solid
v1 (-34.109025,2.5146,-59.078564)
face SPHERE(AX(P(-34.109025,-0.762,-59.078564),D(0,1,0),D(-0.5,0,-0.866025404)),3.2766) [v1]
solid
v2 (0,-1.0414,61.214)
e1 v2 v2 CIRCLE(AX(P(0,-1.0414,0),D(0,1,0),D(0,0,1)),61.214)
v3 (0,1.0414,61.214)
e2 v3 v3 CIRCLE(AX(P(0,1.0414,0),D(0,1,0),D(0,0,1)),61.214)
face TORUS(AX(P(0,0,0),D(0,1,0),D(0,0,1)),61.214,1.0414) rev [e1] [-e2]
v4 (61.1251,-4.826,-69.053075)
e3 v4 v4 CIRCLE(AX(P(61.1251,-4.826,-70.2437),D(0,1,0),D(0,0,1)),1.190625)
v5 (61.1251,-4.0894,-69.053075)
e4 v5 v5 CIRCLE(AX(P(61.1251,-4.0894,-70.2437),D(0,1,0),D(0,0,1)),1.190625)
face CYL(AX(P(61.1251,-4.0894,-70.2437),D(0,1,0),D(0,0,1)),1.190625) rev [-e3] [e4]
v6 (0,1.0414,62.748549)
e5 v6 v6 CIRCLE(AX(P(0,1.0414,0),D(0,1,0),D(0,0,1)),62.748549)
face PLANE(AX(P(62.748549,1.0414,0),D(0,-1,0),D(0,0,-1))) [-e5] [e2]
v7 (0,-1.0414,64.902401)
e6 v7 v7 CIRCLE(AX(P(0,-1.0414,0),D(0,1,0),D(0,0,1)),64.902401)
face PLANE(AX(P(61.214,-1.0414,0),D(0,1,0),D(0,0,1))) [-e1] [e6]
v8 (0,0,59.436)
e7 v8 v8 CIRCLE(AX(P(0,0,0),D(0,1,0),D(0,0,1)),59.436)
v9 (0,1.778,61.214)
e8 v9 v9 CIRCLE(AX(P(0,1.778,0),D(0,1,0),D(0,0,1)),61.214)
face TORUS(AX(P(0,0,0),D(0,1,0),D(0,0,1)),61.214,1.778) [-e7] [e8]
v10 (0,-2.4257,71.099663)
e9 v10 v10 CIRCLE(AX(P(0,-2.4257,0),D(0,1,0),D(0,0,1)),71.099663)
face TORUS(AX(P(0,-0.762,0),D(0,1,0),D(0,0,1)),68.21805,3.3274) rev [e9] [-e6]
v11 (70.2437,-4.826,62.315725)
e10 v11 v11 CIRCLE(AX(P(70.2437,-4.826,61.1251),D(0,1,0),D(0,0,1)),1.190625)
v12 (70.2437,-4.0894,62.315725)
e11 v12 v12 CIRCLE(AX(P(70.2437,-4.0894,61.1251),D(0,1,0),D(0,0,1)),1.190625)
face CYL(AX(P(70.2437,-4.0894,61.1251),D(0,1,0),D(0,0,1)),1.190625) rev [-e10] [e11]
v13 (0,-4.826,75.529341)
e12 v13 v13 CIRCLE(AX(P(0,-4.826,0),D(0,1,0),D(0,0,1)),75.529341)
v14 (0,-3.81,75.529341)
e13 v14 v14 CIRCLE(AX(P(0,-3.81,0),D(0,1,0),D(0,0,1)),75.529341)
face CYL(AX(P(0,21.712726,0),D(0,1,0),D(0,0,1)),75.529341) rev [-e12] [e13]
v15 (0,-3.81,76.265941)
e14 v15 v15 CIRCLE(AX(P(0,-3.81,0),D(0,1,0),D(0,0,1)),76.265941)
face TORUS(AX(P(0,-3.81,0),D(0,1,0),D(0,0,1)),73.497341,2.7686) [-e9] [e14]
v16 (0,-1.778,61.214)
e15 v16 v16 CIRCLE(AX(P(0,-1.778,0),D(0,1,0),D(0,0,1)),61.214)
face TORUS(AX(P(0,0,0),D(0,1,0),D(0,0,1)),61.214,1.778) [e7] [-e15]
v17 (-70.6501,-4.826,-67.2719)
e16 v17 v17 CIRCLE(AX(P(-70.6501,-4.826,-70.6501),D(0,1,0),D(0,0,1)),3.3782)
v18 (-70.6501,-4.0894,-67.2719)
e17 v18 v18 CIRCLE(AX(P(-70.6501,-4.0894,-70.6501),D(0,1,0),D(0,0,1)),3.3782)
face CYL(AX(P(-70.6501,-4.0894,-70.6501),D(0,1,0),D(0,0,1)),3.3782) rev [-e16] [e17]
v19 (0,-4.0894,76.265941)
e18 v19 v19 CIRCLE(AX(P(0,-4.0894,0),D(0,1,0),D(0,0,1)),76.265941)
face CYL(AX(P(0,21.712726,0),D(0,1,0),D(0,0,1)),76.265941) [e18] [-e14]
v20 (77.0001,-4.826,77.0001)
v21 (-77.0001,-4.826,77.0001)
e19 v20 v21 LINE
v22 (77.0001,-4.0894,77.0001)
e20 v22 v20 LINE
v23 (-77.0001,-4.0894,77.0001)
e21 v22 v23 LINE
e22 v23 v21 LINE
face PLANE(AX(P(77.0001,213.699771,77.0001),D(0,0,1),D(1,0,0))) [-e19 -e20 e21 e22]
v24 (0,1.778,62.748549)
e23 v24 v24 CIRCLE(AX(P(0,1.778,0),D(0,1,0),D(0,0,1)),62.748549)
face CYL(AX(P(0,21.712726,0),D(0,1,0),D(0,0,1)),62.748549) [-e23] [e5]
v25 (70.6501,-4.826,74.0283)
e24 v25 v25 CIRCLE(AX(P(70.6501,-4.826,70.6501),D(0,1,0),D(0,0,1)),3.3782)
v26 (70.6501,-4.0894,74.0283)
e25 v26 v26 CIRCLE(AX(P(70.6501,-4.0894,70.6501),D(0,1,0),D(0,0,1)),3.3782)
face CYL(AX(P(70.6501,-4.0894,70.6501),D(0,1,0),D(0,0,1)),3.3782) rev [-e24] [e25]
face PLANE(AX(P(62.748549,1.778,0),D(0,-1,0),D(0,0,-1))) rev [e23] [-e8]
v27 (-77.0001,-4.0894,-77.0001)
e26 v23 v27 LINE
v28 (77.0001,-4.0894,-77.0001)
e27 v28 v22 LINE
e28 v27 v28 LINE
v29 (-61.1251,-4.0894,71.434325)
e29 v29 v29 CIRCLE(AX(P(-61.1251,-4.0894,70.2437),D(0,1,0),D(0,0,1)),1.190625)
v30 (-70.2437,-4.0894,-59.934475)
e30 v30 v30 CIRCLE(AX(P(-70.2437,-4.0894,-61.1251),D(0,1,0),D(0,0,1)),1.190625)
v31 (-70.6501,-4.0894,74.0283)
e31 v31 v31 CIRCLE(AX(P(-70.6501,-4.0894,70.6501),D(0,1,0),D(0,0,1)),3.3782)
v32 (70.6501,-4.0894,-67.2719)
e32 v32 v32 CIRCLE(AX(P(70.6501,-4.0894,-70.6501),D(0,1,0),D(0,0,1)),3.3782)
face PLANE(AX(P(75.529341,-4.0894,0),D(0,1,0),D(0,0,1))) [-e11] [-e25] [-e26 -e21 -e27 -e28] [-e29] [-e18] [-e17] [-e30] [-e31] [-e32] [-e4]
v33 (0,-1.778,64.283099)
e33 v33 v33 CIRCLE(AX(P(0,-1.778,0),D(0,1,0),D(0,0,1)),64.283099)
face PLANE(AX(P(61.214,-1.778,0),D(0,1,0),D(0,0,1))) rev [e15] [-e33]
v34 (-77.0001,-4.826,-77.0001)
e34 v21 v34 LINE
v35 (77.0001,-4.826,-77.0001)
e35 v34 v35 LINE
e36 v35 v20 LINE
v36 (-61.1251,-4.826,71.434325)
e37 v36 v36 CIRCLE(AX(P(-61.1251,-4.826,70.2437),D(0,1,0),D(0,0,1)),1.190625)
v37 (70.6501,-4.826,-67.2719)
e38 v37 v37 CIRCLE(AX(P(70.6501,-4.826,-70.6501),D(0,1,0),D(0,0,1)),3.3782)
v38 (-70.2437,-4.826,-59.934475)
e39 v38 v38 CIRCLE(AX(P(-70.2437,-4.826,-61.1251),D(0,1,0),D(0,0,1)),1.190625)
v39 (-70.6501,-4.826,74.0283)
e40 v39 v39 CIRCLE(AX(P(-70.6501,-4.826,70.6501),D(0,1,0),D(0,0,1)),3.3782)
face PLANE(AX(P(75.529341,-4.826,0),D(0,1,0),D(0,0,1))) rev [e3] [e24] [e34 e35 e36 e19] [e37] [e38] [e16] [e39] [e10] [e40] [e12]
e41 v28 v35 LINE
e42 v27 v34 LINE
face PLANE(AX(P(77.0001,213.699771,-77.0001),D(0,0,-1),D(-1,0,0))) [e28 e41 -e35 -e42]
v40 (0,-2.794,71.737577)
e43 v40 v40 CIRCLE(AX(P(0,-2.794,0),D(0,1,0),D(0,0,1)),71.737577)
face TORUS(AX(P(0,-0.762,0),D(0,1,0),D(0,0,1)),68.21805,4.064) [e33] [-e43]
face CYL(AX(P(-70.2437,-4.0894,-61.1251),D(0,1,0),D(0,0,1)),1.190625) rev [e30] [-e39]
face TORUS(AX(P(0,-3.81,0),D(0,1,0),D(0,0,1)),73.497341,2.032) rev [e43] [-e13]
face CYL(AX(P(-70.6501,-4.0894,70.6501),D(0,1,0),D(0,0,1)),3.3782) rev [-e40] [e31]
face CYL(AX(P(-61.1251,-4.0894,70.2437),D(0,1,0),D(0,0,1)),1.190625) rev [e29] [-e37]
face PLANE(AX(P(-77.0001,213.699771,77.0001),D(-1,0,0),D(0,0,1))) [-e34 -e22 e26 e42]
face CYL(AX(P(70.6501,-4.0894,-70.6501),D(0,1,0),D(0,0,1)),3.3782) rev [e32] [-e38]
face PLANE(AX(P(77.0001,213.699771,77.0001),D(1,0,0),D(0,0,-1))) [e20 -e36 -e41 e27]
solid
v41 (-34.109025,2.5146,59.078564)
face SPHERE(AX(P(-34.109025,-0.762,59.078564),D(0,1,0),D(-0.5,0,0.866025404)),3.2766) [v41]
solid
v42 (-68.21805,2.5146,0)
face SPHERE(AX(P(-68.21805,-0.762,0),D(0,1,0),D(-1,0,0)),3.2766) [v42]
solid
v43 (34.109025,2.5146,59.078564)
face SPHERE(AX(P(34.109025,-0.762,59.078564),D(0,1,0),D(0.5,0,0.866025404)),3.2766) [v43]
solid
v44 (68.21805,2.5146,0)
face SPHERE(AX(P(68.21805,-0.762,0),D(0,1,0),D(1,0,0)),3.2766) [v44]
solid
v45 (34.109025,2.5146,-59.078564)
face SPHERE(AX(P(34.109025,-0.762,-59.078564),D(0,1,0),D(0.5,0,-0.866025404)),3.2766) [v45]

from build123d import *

# Parameters (mm, degrees)
SKETCH2_W                                 = 154.0002
SKETCH2_H                                 = 154.0002
SKETCH2_R                                 = 75.529340861
EXTRUDE1_DEPTH                            = 0.7366
EXTRUDE2_START                            = -0.7366
SKETCH3_R                                 = 75.529340861
EXTRUDE2_DEPTH                            = 0.7366
CIRPATTERN1_COUNT                         = 6
SKETCH5_W                                 = 3.3782
SKETCH5_H                                 = 0.7366
F_5_32_0_156250_DIAMETER_HOLE1_AT_2_COUNT = 2
F_5_32_0_156250_DIAMETER_HOLE1_AT_2_PITCH = 141.3002
F_5_32_0_156250_DIAMETER_HOLE1_AT_3_COUNT = 2
F_5_32_0_156250_DIAMETER_HOLE1_AT_3_PITCH = 141.3002
F_5_32_0_156250_DIAMETER_HOLE1_AT_4_COUNT = 2
F_5_32_0_156250_DIAMETER_HOLE1_AT_4_PITCH = 199.828659206
SKETCH7_W                                 = 2.3876
SKETCH7_H                                 = 8.128
F_5_32_0_156250_DIAMETER_HOLE2_AT_2_COUNT = 2
F_5_32_0_156250_DIAMETER_HOLE2_AT_2_PITCH = 121.0564
F_5_32_0_156250_DIAMETER_HOLE2_AT_3_COUNT = 2
F_5_32_0_156250_DIAMETER_HOLE2_AT_3_PITCH = 171.199602692
F_5_32_0_156250_DIAMETER_HOLE2_AT_4_COUNT = 2
F_5_32_0_156250_DIAMETER_HOLE2_AT_4_PITCH = 121.0564
CIRPATTERN2_COUNT                         = 4


# Read off the part's stored shape, not the designer's step: Revolve-Thin5
with BuildPart() as part:
    # Sketch1 → Revolve-Thin4 (revolve)
    with BuildSketch(Plane.XY, mode=Mode.PRIVATE) as revolve_thin4_sk:
        with BuildLine():
            Line((62.74854946, 1.778), (61.214, 1.778))
            ThreePointArc((61.214, 1.778), (59.436, 0), (61.214, -1.778))
            Line((61.214, -1.778), (64.28309892, -1.778))
            ThreePointArc((64.28309892, -1.778), (67.669225582, -4.788771381), (71.737577241, -2.794))
            ThreePointArc((71.737577241, -2.794), (74.023261161, -1.847238721), (75.529340861, -3.81))
            Line((75.529340861, -3.81), (75.529340861, -4.826))
            Line((75.529340861, -4.826), (77.0001, -4.826))
            Line((77.0001, -4.826), (77.0001, -4.0894))
            Line((77.0001, -4.0894), (76.265940861, -4.0894))
            Line((76.265940861, -4.0894), (76.265940861, -3.81))
            ThreePointArc((76.265940861, -3.81), (74.21390727, -1.135737757), (71.099662929, -2.4257))
            ThreePointArc((71.099662929, -2.4257), (67.492675346, -4.00937161), (64.902401285, -1.0414))
            Line((64.902401285, -1.0414), (61.214, -1.0414))
            ThreePointArc((61.214, -1.0414), (60.1726, 0), (61.214, 1.0414))
            Line((61.214, 1.0414), (62.74854946, 1.0414))
            Line((62.74854946, 1.0414), (62.74854946, 1.778))
        make_face()
    revolve(revolve_thin4_sk.sketch.rotate(Axis((0, 21.71272626, 0), (0, -1, 0)), 90), axis=Axis((0, 21.71272626, 0), (0, -1, 0)))

    # Sketch2 → Extrude1 (add)
    with BuildSketch(Plane.XZ.offset(4.826)):
        Rectangle(SKETCH2_W, SKETCH2_H)
        with Locations(Location((0, 0, 0), (0, 0, 90))):
            Circle(SKETCH2_R, mode=Mode.SUBTRACT)
    extrude(amount=-EXTRUDE1_DEPTH)

    # Sketch5 → 5/32 (0.156250) Diameter Hole1 (revolve, cut)
    with BuildSketch(Plane(origin=(70.6501, -4.0894, -70.6501), x_dir=(0, 0, 1), z_dir=(1, 0, 0))):
        with Locations((1.6891, 0.3683)):
            Rectangle(SKETCH5_W, SKETCH5_H)
    f_5_32_0_156250_diameter_hole1 = revolve(axis=Axis((70.6501, 2.2606, -70.6501), (0, -1, 0)), mode=Mode.SUBTRACT)

    # 5/32 (0.156250) Diameter Hole1 at 2: 5/32 (0.156250) Diameter Hole1 ×2
    with Locations(*[(0, 0, i * F_5_32_0_156250_DIAMETER_HOLE1_AT_2_PITCH) for i in range(1, F_5_32_0_156250_DIAMETER_HOLE1_AT_2_COUNT)]):
        add(f_5_32_0_156250_diameter_hole1, mode=Mode.SUBTRACT)

    # 5/32 (0.156250) Diameter Hole1 at 3: 5/32 (0.156250) Diameter Hole1 ×2
    with Locations(*[(-i * F_5_32_0_156250_DIAMETER_HOLE1_AT_3_PITCH, 0, 0) for i in range(1, F_5_32_0_156250_DIAMETER_HOLE1_AT_3_COUNT)]):
        add(f_5_32_0_156250_diameter_hole1, mode=Mode.SUBTRACT)

    # 5/32 (0.156250) Diameter Hole1 at 4: 5/32 (0.156250) Diameter Hole1 ×2
    with Locations(*[Vector(-0.7071067811865476, 0, 0.7071067811865476) * (i * F_5_32_0_156250_DIAMETER_HOLE1_AT_4_PITCH) for i in range(1, F_5_32_0_156250_DIAMETER_HOLE1_AT_4_COUNT)]):
        add(f_5_32_0_156250_diameter_hole1, mode=Mode.SUBTRACT)

    # Sketch11 → 3/32 (0.093750) Diameter Hole2 (revolve, cut)
    with BuildSketch(Plane(origin=(-70.2437, -4.0894, -61.1251), x_dir=(0, 0, 1), z_dir=(1, 0, 0))):
        Polygon((0, 0), (0, 26.115399675), (1.190625, 25.4), (1.190625, 0), align=None)
    f_3_32_0_093750_diameter_hole2 = revolve(axis=Axis((-70.2437, 2.2606, -61.1251), (0, -1, 0)), mode=Mode.SUBTRACT)

    # CirPattern2: 3/32 (0.093750) Diameter Hole2 ×4 about axis
    cirpattern2_axis = Axis((0, 0, 0), (0, 1, 0))
    for i in range(1, CIRPATTERN2_COUNT):
        add(f_3_32_0_093750_diameter_hole2.rotate(cirpattern2_axis, i * 360 / CIRPATTERN2_COUNT), mode=Mode.SUBTRACT)


with BuildPart() as body_2:
    # Revolve-Thin5 outline → Revolve-Thin5 (revolve)
    with BuildSketch(Plane.XY):
        with BuildLine():
            Line((76.265940861, 2.5654), (77.0001, 2.5654))
            Line((77.0001, 2.5654), (77.0001, 3.302))
            Line((77.0001, 3.302), (75.529340861, 3.302))
            Line((75.529340861, 3.302), (75.529340861, 2.286))
            ThreePointArc((75.529340861, 2.286), (74.023261161, 0.323238721), (71.737577241, 1.27))
            ThreePointArc((71.737577241, 1.27), (68.088390068, 3.299931105), (64.576093872, 1.0414))
            Line((64.576093872, 1.0414), (61.214, 1.0414))
            Line((61.214, 1.0414), (61.214, 0.3048))
            Line((61.214, 0.3048), (65.066299927, 0.3048))
            ThreePointArc((65.066299927, 0.3048), (67.890458911, 2.54923464), (71.099662929, 0.9017))
            ThreePointArc((71.099662929, 0.9017), (74.21390727, -0.388262243), (76.265940861, 2.286))
            Line((76.265940861, 2.286), (76.265940861, 2.5654))
        make_face()
    revolve(axis=Axis((0, 0, 0), (0, 1, 0)))

    # Sketch3 → Extrude2 (add)
    with BuildSketch(Plane(origin=(0, 3.302, 0), x_dir=(-1, 0, 0), z_dir=(0, 1, 0)).offset(EXTRUDE2_START)):
        Polygon((0, -108.894585724), (108.894585724, 0), (0, 108.894585724), (-108.894585724, 0), align=None)
        with Locations(Location((0, 0, 0), (0, 0, 90))):
            Circle(SKETCH3_R, mode=Mode.SUBTRACT)
    extrude(amount=EXTRUDE2_DEPTH)

    # Sketch7 → 5/32 (0.156250) Diameter Hole2 (revolve, cut)
    with BuildSketch(Plane(origin=(85.599801346, 3.302, 0), x_dir=(0, 0, 1), z_dir=(1, 0, 0))):
        with Locations((1.1938, 4.064)):
            Rectangle(SKETCH7_W, SKETCH7_H)
    f_5_32_0_156250_diameter_hole2 = revolve(axis=Axis((85.599801346, 9.652, 0), (0, -1, 0)), mode=Mode.SUBTRACT)

    # 5/32 (0.156250) Diameter Hole2 at 2: 5/32 (0.156250) Diameter Hole2 ×2
    with Locations(*[Vector(-0.7071067811865476, 0, -0.7071067811865476) * (i * F_5_32_0_156250_DIAMETER_HOLE2_AT_2_PITCH) for i in range(1, F_5_32_0_156250_DIAMETER_HOLE2_AT_2_COUNT)]):
        add(f_5_32_0_156250_diameter_hole2, mode=Mode.SUBTRACT)

    # 5/32 (0.156250) Diameter Hole2 at 3: 5/32 (0.156250) Diameter Hole2 ×2
    with Locations(*[(-i * F_5_32_0_156250_DIAMETER_HOLE2_AT_3_PITCH, 0, 0) for i in range(1, F_5_32_0_156250_DIAMETER_HOLE2_AT_3_COUNT)]):
        add(f_5_32_0_156250_diameter_hole2, mode=Mode.SUBTRACT)

    # 5/32 (0.156250) Diameter Hole2 at 4: 5/32 (0.156250) Diameter Hole2 ×2
    with Locations(*[Vector(-0.7071067811865476, 0, 0.7071067811865476) * (i * F_5_32_0_156250_DIAMETER_HOLE2_AT_4_PITCH) for i in range(1, F_5_32_0_156250_DIAMETER_HOLE2_AT_4_COUNT)]):
        add(f_5_32_0_156250_diameter_hole2, mode=Mode.SUBTRACT)


with BuildPart() as body_3:
    # Sketch4 → Revolve1 (revolve)
    with BuildSketch(Plane.XY):
        with BuildLine():
            Line((68.21805, 2.5146), (68.21805, -4.0386))
            ThreePointArc((68.21805, -4.0386), (71.49465, -0.762), (68.21805, 2.5146))
        make_face()
    revolve(axis=Axis((68.21805, 2.837450101, 0), (0, -1, 0)))


with BuildPart() as cirpattern1_1:
    # CirPattern1: pattern copy
    add(body_3.part.rotate(Axis((0, 0, 0), (0, 1, 0)), 1 * 360 / CIRPATTERN1_COUNT))


with BuildPart() as cirpattern1_2:
    # CirPattern1: pattern copy
    add(body_3.part.rotate(Axis((0, 0, 0), (0, 1, 0)), 2 * 360 / CIRPATTERN1_COUNT))


with BuildPart() as cirpattern1_3:
    # CirPattern1: pattern copy
    add(body_3.part.rotate(Axis((0, 0, 0), (0, 1, 0)), 3 * 360 / CIRPATTERN1_COUNT))


with BuildPart() as cirpattern1_4:
    # CirPattern1: pattern copy
    add(body_3.part.rotate(Axis((0, 0, 0), (0, 1, 0)), 4 * 360 / CIRPATTERN1_COUNT))


with BuildPart() as cirpattern1_5:
    # CirPattern1: pattern copy
    add(body_3.part.rotate(Axis((0, 0, 0), (0, 1, 0)), 5 * 360 / CIRPATTERN1_COUNT))


solid = Compound([part.part, body_3.part, cirpattern1_1.part, cirpattern1_2.part, cirpattern1_3.part, cirpattern1_4.part, cirpattern1_5.part])
